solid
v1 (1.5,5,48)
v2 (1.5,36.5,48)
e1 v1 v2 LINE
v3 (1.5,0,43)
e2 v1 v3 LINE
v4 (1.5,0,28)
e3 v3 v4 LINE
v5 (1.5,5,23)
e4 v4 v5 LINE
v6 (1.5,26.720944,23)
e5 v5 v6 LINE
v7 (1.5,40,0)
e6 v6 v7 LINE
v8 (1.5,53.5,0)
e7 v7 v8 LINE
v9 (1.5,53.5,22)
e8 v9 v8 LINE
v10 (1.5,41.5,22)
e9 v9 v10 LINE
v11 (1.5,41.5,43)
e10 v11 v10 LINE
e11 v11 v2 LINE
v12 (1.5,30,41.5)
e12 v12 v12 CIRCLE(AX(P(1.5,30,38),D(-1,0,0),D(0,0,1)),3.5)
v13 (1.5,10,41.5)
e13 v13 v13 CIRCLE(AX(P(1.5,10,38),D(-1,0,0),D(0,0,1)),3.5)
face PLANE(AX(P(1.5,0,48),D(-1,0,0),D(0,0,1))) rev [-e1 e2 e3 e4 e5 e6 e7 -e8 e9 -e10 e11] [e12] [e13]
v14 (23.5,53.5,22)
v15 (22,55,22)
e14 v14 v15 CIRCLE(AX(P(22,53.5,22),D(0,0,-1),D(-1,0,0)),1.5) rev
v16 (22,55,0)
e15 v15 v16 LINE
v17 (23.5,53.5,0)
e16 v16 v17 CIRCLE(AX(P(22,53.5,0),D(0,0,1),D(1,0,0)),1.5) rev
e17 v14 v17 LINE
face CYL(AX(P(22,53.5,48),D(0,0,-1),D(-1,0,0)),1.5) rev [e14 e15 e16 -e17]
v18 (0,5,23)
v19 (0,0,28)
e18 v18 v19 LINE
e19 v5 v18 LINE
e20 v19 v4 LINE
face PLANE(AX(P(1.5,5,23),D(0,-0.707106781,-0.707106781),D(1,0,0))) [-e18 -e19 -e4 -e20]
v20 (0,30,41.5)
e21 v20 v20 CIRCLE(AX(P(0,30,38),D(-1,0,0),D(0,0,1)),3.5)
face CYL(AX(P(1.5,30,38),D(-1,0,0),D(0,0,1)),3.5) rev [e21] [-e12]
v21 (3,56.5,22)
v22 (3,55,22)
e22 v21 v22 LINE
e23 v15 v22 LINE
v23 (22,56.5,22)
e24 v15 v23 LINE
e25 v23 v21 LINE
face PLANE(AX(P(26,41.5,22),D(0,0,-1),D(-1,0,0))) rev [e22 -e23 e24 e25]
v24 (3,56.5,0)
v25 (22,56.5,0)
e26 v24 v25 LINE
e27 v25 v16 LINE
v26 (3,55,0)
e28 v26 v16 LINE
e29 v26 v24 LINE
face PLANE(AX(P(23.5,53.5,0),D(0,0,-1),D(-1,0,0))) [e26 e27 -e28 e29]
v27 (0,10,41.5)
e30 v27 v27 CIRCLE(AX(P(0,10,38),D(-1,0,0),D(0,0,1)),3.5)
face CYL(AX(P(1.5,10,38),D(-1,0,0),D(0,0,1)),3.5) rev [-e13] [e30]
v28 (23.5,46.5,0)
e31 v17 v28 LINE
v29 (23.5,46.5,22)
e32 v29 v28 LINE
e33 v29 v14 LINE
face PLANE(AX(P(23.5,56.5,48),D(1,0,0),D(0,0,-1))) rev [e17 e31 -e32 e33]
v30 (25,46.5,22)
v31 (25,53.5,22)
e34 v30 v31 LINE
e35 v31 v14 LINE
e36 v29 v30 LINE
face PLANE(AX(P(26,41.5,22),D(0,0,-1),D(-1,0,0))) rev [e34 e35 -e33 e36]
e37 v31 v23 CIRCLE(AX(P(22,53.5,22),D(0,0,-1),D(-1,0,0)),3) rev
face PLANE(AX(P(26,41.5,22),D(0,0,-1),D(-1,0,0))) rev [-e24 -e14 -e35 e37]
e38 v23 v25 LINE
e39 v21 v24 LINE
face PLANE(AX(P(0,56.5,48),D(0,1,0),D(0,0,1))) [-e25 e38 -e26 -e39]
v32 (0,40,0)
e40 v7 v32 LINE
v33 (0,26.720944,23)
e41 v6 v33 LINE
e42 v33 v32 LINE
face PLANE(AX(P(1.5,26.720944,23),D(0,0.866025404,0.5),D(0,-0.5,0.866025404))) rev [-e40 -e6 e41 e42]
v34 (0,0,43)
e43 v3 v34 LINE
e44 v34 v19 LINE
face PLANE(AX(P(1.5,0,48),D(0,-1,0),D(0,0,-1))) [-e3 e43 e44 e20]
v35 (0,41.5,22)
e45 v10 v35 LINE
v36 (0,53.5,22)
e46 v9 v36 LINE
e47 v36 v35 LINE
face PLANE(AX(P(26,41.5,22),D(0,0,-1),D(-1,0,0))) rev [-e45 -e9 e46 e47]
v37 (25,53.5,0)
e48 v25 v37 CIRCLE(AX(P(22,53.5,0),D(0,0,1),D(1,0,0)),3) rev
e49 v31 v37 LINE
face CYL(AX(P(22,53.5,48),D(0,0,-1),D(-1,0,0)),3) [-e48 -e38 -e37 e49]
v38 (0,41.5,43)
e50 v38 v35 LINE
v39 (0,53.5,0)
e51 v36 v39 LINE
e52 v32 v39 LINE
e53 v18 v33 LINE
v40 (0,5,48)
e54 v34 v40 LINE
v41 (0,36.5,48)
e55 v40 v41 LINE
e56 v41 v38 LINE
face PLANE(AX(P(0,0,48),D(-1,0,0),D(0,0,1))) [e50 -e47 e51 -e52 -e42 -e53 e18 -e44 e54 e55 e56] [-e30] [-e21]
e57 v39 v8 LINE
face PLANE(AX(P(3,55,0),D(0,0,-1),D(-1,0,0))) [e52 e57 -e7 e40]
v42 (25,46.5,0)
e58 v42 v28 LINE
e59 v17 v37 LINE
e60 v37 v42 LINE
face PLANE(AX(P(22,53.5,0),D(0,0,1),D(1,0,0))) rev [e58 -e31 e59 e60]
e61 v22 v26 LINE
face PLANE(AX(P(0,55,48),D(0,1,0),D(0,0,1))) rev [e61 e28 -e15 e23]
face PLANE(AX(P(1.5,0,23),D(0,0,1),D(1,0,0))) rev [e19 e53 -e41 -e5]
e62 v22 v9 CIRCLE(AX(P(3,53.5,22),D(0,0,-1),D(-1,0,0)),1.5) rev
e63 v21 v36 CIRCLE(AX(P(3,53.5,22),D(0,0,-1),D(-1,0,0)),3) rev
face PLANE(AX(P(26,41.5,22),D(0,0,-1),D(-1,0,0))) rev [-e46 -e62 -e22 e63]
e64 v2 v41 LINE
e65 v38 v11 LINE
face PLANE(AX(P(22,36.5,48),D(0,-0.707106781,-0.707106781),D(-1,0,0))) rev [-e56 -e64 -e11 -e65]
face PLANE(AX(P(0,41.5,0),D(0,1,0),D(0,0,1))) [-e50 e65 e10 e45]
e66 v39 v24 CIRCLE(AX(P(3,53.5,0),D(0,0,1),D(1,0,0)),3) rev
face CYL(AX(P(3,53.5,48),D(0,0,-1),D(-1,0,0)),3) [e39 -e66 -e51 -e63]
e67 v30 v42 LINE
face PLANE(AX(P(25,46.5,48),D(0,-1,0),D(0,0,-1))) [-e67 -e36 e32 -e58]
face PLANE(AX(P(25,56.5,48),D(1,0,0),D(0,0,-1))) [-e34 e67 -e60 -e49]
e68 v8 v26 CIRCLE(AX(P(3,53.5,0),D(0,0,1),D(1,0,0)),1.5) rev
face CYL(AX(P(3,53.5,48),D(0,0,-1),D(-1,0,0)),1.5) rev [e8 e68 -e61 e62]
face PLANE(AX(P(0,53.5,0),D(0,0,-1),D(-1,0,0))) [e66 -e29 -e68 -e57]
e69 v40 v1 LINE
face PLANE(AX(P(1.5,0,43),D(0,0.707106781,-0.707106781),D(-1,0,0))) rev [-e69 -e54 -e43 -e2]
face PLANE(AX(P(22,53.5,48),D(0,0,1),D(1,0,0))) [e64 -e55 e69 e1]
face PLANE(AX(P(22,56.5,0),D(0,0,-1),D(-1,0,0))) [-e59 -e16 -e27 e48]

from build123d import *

# Parameters (mm, degrees)
SM_BASE_FLANGE_1_DEPTH = 48
CUT_EXTRUDE_1_DEPTH    = 10
SKETCH_10_R            = 3.5
CUT_EXTRUDE_2_DEPTH    = 10
SKETCH_11_W            = 30
SKETCH_11_H            = 26
CUT_EXTRUDE_3_DEPTH    = 15
OTHER_START            = 16.263455967
OTHER_1_OUTLINE_W      = 4
OTHER_1_OUTLINE_H      = 30.405591591
OTHER_1_DEPTH          = 3.535533906
OTHER_START_2          = 59.75052301
OTHER_1_2_OUTLINE_W    = 4
OTHER_1_2_OUTLINE_H    = 30.405591591
OTHER_1_2_DEPTH        = 3.535533906
OTHER_START_3          = 30.405591591
OTHER_1_3_OUTLINE_W    = 4
OTHER_1_3_OUTLINE_H    = 3.594408409
OTHER_1_3_DEPTH        = 7.071067812


# Read off the part's stored shape, not the designer's step: Затупленный угол1
# Sheet-metal steps are written as plain solids
with BuildPart() as part:
    # Sketch 2 → Базовая кромка1 (new body)
    with BuildSketch(Plane.XY):
        with BuildLine():
            Line((0, 0), (0, 53.5))
            ThreePointArc((0, 53.5), (0.878679656, 55.621320344), (3, 56.5))
            Line((3, 56.5), (22, 56.5))
            ThreePointArc((22, 56.5), (24.121320344, 55.621320344), (25, 53.5))
            Line((25, 53.5), (25, 46.5))
            Line((25, 46.5), (23.5, 46.5))
            Line((23.5, 46.5), (23.5, 53.5))
            ThreePointArc((23.5, 53.5), (23.060660172, 54.560660172), (22, 55))
            Line((22, 55), (3, 55))
            ThreePointArc((3, 55), (1.939339828, 54.560660172), (1.5, 53.5))
            Line((1.5, 53.5), (1.5, 0))
            Line((1.5, 0), (0, 0))
        make_face()
    extrude(amount=SM_BASE_FLANGE_1_DEPTH)

    # Эскиз7 → Вырез-Вытянуть1 (cut)
    with BuildSketch(Plane.ZY):
        Polygon((23, 0), (23, 26.720943809), (0, 40), (0, 0), align=None)
    extrude(amount=-CUT_EXTRUDE_1_DEPTH, mode=Mode.SUBTRACT)

    # Эскиз10 → Вырез-Вытянуть2 (cut)
    with BuildSketch(Plane.ZY):
        with Locations((38, 10)):
            Circle(SKETCH_10_R)
        with Locations((38, 30)):
            Circle(SKETCH_10_R)
    extrude(amount=-CUT_EXTRUDE_2_DEPTH, mode=Mode.SUBTRACT)

    # Эскиз11 → Вырез-Вытянуть3 (cut)
    with BuildSketch(Plane(origin=(0, 56.5, 0), x_dir=(1, 0, 0), z_dir=(0, 1, 0))):
        with Locations((11, -35)):
            Rectangle(SKETCH_11_W, SKETCH_11_H)
    extrude(amount=-CUT_EXTRUDE_3_DEPTH, mode=Mode.SUBTRACT)

    # Other 1 outline → Other 1 (cut)
    with BuildSketch(Plane(origin=(0, 0, 0), x_dir=(1, 0, 0), z_dir=(0, 0.707106781186547, 0.707106781186548)).offset(OTHER_START)):
        with Locations((1, -15.202795796)):
            Rectangle(OTHER_1_OUTLINE_W, OTHER_1_OUTLINE_H)
    extrude(amount=OTHER_1_DEPTH, mode=Mode.SUBTRACT)

    # Other 1 2 outline → Other 1 2 (cut)
    with BuildSketch(Plane(origin=(0, 0, 0), x_dir=(1, 0, 0), z_dir=(0, 0.707106781186547, 0.707106781186548)).offset(OTHER_START_2)):
        with Locations((1, -15.202795796)):
            Rectangle(OTHER_1_2_OUTLINE_W, OTHER_1_2_OUTLINE_H)
    extrude(amount=OTHER_1_2_DEPTH, mode=Mode.SUBTRACT)

    # Other 1 3 outline → Other 1 3 (cut)
    with BuildSketch(Plane(origin=(0, 0, 0), x_dir=(1, 0, 0), z_dir=(0, 0.707106781186547, 0.707106781186548)).offset(OTHER_START_3)):
        with Locations((1, -32.202795796)):
            Rectangle(OTHER_1_3_OUTLINE_W, OTHER_1_3_OUTLINE_H)
    extrude(amount=OTHER_1_3_DEPTH, mode=Mode.SUBTRACT)


solid = part.part
